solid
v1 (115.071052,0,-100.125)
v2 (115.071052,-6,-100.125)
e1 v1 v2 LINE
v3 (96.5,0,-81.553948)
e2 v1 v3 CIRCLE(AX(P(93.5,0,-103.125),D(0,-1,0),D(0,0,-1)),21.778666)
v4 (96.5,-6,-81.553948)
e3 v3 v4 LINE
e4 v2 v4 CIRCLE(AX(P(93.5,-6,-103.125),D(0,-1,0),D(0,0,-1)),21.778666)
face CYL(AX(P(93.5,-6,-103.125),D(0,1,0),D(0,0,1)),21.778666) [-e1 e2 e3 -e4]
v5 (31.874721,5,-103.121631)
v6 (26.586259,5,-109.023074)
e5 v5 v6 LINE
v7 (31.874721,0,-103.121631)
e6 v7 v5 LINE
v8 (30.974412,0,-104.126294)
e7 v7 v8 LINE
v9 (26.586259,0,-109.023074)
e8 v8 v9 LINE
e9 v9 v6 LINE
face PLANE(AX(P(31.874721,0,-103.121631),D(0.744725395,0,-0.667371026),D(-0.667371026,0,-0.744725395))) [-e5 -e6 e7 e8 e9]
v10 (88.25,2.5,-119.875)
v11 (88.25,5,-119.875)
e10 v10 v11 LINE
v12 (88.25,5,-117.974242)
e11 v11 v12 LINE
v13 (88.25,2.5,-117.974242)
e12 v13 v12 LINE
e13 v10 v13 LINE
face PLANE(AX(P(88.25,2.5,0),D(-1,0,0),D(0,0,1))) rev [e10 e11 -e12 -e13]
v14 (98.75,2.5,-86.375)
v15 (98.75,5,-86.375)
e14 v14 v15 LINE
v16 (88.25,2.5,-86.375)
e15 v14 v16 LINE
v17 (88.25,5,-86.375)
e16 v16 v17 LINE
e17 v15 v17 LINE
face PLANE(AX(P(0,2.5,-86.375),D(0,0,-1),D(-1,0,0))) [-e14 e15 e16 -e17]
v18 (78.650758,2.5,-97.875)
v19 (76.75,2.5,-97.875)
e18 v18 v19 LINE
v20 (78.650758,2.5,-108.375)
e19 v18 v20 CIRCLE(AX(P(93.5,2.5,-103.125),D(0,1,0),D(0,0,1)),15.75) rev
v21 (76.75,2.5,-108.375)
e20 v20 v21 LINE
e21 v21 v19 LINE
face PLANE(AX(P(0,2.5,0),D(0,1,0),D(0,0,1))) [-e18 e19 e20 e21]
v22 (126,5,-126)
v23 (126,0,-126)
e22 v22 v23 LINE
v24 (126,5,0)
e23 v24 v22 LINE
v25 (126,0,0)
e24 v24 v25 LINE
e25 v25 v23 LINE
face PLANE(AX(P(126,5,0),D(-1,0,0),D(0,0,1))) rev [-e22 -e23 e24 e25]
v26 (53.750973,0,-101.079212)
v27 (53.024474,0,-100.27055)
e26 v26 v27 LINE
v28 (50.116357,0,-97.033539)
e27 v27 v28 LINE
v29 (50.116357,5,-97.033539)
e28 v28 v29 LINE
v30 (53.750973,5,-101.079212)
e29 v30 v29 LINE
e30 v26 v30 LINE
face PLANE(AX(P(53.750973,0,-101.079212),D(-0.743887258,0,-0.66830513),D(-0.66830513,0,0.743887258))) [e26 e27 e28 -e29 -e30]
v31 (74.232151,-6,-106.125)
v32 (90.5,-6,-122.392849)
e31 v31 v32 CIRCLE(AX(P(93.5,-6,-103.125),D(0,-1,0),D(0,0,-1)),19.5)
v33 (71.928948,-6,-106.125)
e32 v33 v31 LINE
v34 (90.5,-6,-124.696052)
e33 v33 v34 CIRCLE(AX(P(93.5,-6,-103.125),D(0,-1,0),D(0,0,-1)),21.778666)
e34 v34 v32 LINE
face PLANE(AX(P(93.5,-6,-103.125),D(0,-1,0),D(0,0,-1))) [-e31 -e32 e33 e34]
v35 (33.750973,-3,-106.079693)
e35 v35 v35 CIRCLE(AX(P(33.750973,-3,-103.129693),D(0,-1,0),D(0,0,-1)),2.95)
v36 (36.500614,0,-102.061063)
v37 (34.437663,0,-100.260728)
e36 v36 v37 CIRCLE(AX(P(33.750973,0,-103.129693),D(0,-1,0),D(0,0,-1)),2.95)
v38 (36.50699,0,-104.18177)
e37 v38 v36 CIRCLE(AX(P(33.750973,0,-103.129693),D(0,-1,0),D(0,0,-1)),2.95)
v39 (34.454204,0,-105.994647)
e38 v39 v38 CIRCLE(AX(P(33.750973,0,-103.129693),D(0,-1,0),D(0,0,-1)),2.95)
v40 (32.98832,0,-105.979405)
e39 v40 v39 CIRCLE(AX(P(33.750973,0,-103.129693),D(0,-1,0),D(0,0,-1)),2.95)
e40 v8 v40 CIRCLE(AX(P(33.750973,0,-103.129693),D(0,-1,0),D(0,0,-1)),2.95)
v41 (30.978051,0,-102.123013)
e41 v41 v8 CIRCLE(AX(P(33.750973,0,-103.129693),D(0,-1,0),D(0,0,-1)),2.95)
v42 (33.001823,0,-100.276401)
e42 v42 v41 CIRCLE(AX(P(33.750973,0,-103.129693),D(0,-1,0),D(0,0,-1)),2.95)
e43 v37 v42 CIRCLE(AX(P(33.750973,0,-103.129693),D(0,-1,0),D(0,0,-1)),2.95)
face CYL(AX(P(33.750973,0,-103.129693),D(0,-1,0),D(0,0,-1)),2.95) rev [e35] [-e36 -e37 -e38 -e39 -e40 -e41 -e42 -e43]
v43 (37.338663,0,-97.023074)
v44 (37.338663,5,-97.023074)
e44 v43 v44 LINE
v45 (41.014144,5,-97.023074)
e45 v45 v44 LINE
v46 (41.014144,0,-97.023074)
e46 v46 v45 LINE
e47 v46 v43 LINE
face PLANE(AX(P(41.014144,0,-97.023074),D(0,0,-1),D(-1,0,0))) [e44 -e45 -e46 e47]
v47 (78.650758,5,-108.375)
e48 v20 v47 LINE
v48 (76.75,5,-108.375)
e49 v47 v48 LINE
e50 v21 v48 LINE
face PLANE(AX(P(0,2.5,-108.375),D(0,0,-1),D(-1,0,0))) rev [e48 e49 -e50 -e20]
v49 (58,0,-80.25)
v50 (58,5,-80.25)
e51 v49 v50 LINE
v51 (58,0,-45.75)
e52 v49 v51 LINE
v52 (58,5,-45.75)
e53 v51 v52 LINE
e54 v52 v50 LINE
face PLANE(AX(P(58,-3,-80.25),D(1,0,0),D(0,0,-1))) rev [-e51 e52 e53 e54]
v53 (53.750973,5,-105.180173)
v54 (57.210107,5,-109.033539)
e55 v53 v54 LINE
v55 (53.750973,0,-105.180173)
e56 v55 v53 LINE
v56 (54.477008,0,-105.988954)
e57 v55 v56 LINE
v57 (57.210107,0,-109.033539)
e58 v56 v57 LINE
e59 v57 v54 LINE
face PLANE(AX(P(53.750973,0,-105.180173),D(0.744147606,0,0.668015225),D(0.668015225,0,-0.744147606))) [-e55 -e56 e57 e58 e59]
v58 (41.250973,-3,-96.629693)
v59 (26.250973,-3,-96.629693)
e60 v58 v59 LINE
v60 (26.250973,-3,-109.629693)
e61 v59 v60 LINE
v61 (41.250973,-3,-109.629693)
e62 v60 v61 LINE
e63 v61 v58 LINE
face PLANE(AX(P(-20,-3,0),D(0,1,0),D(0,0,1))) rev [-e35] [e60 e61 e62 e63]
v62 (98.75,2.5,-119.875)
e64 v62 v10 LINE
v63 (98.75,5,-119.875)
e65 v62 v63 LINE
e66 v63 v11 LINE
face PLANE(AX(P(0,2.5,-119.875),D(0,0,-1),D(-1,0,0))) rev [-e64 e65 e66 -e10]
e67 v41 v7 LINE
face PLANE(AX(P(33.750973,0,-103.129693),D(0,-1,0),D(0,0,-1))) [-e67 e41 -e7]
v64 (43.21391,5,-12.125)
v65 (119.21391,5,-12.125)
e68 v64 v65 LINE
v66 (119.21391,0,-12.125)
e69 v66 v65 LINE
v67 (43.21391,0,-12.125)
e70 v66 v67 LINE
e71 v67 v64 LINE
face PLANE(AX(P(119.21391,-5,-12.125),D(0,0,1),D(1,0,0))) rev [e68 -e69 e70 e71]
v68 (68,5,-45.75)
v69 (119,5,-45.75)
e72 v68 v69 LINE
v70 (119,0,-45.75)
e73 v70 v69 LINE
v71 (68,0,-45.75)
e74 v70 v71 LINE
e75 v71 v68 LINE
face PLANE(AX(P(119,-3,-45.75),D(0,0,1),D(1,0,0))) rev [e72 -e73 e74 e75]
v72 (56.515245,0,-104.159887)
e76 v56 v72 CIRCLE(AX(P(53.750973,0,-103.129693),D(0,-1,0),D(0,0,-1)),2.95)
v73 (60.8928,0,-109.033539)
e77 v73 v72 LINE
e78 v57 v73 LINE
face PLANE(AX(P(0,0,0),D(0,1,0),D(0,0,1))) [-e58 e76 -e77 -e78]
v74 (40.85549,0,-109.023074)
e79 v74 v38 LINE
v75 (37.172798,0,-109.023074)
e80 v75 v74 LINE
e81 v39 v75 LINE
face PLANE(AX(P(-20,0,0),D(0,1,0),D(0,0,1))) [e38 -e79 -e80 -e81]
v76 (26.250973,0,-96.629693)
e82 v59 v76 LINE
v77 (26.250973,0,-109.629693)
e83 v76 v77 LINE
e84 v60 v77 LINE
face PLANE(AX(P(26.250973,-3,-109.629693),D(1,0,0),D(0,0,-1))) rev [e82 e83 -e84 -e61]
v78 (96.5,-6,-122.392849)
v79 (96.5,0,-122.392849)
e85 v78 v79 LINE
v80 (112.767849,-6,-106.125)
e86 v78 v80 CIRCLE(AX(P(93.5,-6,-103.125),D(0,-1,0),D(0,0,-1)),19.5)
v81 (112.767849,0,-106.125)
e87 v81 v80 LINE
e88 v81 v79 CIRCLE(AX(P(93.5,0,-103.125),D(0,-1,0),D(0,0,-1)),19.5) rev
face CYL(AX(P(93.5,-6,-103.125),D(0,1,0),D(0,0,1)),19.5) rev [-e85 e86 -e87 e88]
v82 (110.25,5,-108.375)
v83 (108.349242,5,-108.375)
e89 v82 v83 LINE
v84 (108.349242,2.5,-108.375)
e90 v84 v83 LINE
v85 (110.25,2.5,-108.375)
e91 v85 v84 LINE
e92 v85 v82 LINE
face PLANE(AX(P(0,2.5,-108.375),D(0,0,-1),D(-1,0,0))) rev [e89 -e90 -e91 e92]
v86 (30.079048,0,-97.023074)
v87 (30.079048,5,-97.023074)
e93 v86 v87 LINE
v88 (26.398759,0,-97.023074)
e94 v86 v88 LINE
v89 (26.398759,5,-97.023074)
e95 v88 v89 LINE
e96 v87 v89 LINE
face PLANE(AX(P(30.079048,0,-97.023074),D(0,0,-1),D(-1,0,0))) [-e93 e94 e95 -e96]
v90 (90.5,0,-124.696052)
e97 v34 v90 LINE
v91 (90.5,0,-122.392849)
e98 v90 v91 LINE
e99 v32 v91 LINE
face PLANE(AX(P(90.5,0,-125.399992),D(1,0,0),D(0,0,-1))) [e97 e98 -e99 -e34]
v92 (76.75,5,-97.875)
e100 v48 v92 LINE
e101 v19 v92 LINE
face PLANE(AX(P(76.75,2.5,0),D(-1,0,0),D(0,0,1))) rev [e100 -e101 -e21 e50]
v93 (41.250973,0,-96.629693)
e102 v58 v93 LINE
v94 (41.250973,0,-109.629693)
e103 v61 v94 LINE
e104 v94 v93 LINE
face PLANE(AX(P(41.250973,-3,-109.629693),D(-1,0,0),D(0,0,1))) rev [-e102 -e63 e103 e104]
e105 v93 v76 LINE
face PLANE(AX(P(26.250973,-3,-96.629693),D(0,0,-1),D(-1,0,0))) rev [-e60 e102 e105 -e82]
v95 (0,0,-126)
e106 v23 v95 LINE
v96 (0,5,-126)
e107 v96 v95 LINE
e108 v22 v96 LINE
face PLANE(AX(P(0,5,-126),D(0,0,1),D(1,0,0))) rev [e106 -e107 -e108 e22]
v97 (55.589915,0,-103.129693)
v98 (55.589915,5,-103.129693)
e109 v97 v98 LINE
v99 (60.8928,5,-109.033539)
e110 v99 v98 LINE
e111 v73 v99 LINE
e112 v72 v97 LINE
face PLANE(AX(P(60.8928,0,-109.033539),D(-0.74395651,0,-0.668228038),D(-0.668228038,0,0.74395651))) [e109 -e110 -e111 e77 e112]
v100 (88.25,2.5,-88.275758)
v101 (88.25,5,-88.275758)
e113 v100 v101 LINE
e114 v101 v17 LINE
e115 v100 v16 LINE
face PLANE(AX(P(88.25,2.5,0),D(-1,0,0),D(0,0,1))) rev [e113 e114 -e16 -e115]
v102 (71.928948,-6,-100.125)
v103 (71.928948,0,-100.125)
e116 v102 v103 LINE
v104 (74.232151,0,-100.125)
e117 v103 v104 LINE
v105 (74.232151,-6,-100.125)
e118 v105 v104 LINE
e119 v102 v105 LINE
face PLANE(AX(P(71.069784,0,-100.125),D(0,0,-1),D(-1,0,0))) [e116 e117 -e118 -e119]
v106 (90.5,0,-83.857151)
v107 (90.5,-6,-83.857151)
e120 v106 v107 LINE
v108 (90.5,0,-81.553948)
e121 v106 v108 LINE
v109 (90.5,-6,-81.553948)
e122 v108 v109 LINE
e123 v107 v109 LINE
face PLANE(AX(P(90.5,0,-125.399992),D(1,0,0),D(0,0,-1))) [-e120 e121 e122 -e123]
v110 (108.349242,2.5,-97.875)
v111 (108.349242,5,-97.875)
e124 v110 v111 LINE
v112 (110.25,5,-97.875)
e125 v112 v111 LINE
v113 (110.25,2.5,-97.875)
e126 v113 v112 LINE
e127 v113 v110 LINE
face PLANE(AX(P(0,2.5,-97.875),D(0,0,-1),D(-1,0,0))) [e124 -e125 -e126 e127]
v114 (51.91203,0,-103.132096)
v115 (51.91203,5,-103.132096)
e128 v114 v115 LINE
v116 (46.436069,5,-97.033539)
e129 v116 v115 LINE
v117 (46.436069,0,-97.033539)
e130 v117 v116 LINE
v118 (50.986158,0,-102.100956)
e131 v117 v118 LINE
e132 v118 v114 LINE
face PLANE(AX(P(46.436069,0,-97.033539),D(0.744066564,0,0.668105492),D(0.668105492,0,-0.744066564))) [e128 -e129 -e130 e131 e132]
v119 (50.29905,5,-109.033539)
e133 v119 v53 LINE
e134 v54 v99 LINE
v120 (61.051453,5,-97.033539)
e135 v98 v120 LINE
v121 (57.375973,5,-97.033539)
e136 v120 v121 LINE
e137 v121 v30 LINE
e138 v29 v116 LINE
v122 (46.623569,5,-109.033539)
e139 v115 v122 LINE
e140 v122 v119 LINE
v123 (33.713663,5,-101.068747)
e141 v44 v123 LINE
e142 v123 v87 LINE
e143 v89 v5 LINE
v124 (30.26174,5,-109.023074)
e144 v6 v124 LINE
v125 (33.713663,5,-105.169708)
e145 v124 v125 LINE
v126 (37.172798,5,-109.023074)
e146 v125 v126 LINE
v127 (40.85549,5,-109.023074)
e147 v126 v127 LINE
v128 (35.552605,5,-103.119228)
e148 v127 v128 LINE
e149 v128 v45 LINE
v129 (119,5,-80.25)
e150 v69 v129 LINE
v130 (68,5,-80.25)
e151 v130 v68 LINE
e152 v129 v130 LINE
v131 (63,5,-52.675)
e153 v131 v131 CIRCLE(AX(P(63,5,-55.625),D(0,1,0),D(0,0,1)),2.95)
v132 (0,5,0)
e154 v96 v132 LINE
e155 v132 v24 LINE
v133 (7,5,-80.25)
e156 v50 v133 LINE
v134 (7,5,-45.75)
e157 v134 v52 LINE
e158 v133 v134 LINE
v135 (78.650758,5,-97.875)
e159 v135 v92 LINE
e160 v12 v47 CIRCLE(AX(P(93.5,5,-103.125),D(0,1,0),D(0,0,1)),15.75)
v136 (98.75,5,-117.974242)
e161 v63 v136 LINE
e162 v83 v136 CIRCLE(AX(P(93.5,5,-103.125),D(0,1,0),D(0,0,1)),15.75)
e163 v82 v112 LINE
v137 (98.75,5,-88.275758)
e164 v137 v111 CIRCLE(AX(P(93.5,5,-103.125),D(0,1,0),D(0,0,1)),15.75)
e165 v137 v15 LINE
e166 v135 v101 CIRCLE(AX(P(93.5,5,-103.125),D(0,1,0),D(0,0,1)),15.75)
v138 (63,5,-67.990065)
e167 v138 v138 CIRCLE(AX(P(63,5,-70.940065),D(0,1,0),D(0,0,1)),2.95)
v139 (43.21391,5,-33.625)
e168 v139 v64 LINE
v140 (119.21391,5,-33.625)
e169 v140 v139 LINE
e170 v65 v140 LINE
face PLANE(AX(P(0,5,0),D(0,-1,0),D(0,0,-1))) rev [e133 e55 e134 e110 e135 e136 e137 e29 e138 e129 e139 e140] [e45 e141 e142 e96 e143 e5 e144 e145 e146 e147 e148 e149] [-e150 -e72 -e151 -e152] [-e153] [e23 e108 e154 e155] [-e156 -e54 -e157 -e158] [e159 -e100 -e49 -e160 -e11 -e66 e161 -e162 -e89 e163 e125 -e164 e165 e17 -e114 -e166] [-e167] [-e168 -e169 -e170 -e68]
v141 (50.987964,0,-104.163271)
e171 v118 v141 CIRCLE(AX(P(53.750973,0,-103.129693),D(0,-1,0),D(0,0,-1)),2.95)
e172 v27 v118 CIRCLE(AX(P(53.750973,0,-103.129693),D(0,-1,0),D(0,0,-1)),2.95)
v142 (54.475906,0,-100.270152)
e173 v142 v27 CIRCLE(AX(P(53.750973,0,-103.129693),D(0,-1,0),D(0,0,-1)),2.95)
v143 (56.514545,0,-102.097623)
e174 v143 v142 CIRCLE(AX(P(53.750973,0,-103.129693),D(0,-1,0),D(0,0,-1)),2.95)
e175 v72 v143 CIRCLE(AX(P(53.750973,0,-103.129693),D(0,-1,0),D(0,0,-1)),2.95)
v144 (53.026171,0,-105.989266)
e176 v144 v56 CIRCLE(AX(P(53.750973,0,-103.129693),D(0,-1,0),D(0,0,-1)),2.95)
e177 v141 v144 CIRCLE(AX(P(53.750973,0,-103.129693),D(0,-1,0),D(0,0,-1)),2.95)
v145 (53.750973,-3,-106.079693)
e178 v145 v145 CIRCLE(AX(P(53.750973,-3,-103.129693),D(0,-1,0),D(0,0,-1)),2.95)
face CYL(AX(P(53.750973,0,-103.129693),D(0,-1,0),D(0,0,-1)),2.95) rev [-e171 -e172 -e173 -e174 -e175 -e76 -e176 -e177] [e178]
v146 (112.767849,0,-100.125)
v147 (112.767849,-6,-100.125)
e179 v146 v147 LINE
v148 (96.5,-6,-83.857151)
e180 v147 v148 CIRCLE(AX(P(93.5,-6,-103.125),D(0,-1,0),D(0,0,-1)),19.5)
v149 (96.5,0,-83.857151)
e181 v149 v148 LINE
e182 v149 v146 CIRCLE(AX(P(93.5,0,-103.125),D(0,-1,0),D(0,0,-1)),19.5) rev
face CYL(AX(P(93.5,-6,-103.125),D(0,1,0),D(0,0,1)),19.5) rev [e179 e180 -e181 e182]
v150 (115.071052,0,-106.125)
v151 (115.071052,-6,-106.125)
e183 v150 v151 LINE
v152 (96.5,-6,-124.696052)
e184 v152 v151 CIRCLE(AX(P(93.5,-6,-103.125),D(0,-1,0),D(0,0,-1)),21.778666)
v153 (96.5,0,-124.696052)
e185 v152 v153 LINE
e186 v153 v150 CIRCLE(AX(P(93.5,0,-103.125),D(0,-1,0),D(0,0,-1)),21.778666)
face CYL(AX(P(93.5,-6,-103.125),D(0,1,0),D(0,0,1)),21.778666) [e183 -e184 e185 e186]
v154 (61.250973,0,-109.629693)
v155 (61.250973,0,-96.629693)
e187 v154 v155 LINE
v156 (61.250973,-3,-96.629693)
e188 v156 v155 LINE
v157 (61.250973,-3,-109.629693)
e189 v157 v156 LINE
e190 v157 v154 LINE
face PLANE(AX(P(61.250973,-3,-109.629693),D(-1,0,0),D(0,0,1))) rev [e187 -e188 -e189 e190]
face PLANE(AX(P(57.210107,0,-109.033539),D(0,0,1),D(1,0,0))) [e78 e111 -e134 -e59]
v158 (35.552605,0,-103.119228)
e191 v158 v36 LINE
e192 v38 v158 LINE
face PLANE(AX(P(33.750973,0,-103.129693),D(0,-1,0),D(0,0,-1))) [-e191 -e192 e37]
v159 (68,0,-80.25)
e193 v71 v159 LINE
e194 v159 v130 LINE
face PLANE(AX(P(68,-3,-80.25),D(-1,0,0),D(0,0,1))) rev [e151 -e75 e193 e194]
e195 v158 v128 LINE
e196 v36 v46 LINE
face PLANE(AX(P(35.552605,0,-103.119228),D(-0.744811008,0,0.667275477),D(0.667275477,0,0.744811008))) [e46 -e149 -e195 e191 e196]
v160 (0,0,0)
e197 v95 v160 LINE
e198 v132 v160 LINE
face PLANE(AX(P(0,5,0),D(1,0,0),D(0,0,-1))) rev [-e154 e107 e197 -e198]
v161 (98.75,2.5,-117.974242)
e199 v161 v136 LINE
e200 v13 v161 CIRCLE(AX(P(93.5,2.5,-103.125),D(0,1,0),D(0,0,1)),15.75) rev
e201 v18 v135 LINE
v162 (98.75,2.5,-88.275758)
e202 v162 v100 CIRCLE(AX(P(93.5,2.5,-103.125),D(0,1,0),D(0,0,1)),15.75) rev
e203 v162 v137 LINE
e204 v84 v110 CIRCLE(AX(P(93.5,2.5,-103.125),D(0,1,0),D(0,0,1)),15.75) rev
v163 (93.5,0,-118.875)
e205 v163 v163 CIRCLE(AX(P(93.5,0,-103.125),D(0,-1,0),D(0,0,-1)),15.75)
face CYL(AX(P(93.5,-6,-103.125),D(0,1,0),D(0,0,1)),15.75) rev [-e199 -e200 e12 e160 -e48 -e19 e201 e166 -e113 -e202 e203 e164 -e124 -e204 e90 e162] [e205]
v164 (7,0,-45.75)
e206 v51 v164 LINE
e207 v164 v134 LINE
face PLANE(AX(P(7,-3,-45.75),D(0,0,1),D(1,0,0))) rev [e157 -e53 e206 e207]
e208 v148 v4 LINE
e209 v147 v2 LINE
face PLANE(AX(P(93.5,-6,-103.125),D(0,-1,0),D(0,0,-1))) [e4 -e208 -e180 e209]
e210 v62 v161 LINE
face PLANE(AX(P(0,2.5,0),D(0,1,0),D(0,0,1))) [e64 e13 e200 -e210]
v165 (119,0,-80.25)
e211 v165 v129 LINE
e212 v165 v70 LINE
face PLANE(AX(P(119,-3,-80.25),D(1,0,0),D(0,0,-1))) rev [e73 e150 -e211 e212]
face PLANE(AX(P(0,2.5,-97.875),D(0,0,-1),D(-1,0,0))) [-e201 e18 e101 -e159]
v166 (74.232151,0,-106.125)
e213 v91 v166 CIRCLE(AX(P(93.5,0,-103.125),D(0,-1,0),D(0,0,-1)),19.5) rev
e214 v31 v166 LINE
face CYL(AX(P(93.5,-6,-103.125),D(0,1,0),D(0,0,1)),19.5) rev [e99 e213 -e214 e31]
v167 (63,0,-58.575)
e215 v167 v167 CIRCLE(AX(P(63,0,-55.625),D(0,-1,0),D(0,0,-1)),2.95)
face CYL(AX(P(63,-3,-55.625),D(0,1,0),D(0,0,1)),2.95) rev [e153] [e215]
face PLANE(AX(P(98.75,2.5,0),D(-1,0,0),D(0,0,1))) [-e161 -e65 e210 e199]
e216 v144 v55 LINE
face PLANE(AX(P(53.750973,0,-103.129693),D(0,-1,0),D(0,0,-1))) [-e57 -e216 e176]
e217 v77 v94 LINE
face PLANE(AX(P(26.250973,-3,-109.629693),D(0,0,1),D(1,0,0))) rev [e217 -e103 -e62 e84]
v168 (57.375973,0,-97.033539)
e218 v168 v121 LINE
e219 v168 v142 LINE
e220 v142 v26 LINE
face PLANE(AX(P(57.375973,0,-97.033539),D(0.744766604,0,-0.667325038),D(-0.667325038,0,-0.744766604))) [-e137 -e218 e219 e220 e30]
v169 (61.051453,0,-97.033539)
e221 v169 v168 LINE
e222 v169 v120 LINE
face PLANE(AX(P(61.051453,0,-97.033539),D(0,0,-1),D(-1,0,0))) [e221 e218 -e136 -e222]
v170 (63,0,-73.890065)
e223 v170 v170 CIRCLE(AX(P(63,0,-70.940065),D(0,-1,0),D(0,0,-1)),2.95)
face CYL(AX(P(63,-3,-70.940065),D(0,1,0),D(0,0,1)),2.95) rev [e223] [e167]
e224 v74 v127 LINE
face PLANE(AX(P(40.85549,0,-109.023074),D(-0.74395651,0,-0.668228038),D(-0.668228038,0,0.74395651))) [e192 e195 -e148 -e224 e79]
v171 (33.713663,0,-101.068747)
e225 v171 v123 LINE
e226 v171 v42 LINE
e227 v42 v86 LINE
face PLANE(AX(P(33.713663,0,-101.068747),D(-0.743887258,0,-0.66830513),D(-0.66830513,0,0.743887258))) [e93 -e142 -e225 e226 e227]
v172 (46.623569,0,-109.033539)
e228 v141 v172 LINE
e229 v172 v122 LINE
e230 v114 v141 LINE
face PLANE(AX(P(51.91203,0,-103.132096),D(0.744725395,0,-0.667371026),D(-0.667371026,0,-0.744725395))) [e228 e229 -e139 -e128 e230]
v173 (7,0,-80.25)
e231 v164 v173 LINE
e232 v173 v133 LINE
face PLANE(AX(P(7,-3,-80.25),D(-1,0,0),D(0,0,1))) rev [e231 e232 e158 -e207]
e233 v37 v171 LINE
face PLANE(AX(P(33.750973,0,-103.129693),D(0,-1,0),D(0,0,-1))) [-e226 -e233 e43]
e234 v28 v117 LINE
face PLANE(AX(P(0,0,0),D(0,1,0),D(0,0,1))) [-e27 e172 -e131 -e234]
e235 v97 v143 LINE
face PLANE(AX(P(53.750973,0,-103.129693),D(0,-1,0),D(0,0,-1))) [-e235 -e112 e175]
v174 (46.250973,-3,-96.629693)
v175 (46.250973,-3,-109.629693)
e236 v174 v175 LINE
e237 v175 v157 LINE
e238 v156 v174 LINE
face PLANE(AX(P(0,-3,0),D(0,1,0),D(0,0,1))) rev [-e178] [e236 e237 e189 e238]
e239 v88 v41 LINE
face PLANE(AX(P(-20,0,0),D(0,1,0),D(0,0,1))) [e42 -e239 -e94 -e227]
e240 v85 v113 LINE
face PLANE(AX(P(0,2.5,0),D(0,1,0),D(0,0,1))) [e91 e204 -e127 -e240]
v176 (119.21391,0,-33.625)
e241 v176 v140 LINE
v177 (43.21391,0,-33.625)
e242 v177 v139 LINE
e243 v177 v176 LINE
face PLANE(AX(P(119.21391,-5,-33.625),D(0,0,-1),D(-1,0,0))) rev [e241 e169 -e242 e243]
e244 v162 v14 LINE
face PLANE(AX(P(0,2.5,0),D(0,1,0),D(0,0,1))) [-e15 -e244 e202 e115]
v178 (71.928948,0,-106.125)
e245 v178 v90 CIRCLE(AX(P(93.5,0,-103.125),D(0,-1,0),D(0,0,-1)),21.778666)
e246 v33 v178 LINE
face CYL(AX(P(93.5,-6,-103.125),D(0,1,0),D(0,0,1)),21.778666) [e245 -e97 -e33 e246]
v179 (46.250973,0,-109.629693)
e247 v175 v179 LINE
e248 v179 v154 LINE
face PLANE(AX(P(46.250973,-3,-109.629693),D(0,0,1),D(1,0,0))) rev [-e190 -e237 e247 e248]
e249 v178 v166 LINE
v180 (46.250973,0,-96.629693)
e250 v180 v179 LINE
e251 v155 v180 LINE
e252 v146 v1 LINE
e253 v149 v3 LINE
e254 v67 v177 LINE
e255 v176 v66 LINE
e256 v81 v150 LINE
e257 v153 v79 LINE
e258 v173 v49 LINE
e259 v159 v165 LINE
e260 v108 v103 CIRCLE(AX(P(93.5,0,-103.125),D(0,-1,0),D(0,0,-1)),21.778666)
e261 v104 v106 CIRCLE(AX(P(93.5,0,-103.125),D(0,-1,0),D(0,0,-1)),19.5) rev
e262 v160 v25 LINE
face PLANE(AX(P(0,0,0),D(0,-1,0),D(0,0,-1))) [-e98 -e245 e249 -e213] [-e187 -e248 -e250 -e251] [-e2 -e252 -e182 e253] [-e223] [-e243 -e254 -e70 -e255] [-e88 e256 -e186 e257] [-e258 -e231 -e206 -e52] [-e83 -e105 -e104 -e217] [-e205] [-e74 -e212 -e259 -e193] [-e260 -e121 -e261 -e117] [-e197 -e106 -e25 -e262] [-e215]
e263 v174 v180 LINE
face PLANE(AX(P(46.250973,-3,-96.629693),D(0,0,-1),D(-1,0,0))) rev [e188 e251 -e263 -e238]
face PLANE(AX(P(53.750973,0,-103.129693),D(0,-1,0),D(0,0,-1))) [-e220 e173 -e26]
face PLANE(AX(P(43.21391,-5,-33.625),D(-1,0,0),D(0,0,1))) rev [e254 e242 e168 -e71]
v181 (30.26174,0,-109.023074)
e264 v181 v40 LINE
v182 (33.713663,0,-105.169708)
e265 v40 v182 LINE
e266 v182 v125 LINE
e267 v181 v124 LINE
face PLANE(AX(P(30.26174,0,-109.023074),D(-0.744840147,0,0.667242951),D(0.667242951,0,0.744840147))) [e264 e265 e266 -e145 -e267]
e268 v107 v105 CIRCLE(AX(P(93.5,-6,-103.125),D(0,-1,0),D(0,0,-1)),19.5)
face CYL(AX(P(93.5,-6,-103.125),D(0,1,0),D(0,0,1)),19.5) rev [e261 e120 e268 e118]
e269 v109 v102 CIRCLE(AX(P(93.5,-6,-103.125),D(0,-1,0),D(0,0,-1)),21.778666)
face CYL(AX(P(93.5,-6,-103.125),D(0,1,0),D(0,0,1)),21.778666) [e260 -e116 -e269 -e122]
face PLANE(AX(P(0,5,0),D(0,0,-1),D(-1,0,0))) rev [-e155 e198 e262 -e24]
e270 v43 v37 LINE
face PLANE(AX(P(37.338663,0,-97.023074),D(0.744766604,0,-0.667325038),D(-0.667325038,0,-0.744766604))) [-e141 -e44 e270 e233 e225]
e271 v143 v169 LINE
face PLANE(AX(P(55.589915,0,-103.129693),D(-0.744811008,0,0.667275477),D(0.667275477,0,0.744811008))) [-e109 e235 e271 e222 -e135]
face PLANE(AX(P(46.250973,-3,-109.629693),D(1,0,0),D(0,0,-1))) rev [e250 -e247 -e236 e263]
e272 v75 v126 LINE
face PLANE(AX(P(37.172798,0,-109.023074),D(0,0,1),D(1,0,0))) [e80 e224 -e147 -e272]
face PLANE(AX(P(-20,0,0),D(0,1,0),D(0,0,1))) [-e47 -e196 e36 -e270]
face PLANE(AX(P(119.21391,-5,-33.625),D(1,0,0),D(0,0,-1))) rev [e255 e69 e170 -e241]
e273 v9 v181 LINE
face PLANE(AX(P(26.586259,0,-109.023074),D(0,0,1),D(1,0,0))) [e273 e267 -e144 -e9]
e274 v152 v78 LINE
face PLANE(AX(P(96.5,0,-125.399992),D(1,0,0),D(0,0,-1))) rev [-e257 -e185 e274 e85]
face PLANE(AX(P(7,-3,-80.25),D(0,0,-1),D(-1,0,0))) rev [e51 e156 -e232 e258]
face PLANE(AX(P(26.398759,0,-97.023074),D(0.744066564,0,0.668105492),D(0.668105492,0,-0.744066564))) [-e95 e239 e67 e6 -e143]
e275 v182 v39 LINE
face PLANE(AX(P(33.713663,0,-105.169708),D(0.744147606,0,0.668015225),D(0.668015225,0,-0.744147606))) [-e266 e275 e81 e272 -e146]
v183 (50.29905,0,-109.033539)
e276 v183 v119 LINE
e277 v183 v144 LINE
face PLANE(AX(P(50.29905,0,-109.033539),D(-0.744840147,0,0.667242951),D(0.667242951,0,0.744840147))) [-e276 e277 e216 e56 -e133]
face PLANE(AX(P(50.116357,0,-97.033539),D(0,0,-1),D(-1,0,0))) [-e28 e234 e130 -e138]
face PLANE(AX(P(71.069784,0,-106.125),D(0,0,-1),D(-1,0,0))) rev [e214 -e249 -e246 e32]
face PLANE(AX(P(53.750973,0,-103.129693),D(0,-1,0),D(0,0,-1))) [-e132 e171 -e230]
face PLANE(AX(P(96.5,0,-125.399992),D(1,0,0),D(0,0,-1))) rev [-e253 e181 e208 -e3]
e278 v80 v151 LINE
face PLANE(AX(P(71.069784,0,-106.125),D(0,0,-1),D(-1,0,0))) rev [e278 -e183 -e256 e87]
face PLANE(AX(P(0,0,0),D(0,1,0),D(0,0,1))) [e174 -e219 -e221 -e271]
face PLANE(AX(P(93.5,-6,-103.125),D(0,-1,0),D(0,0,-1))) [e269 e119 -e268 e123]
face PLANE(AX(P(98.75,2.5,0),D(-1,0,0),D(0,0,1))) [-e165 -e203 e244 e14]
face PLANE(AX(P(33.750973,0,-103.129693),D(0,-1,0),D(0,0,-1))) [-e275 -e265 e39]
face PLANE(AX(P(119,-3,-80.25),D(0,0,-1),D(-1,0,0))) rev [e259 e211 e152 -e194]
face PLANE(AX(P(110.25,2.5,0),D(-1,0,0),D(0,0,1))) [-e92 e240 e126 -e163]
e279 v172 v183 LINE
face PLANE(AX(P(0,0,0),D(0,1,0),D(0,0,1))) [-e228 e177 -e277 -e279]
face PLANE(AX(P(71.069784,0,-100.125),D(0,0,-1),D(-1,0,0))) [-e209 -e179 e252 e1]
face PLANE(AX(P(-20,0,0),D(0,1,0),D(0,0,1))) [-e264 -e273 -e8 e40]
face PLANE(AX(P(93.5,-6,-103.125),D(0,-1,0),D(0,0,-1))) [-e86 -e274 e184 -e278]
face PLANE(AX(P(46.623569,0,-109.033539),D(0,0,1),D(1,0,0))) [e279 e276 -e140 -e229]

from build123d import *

# Parameters (mm, degrees)
SKETCH1_W           = 126
SKETCH1_H           = 126
BOSS_EXTRUDE1_DEPTH = 5
SKETCH4_W           = 76
SKETCH4_H           = 21.5
CUT_EXTRUDE3_DEPTH  = 10
CUT_EXTRUDE4_START  = -5
CUT_EXTRUDE4_DEPTH  = 5
SKETCH11_W          = 15
SKETCH11_H          = 13
BOSS_EXTRUDE2_DEPTH = 3
SKETCH12_R          = 2.95
CUT_EXTRUDE5_DEPTH  = 3
LPATTERN1_COUNT     = 2
LPATTERN1_PITCH     = 20
LPATTERN2_COUNT     = 2
LPATTERN2_PITCH     = 20
SKETCH13_W          = 51
SKETCH13_H          = 34.5
CUT_EXTRUDE6_DEPTH  = 179.370401132
SKETCH14_W          = 51
SKETCH14_H          = 34.5
CUT_EXTRUDE7_DEPTH  = 179.370401132
SKETCH17_R          = 2.95
CUT_EXTRUDE10_DEPTH = 179.370401132
SKETCH18_R          = 21.778665512
SKETCH18_R_2        = 19.5
BOSS_EXTRUDE3_DEPTH = 6
SKETCH19_W          = 44.860431558
SKETCH19_H          = 6
SKETCH19_W_2        = 6
SKETCH19_H_2        = 44.549983506
CUT_EXTRUDE11_DEPTH = 6
SKETCH21_R          = 15.75
CUT_EXTRUDE14_DEPTH = 179.530109505
CUT_EXTRUDE15_DEPTH = 2.5


# Read off the part's stored shape, not the designer's step: Cut-Extrude4
with BuildPart() as part:
    # Sketch1 → Boss-Extrude1 (new body)
    with BuildSketch(Plane(origin=(0, 0, 0), x_dir=(1, 0, 0), z_dir=(0, 1, 0))):
        with Locations((63, 63)):
            Rectangle(SKETCH1_W, SKETCH1_H)
    extrude(amount=BOSS_EXTRUDE1_DEPTH)

    # Sketch4 → Cut-Extrude3 (cut)
    with BuildSketch(Plane(origin=(0, 5, 0), x_dir=(1, 0, 0), z_dir=(0, 1, 0))):
        with Locations((81.213909597, 22.875)):
            Rectangle(SKETCH4_W, SKETCH4_H)
    extrude(amount=-CUT_EXTRUDE3_DEPTH, mode=Mode.SUBTRACT)

    # Cut-Extrude4 outline → Cut-Extrude4 (cut)
    with BuildSketch(Plane(origin=(0, 5, 0), x_dir=(1, 0, 0), z_dir=(0, 1, 0)).offset(CUT_EXTRUDE4_START)):
        Polygon((46.623568796, 109.033538796), (51.912030335, 103.132096488), (46.436068796, 97.033538796), (50.116357258, 97.033538796), (53.750972642, 101.079211873), (57.375972642, 97.033538796), (61.051453412, 97.033538796), (55.58991495, 103.129692642), (60.892799565, 109.033538796), (57.210107258, 109.033538796), (53.750972642, 105.180173411), (50.299049565, 109.033538796), align=None)
        Polygon((26.586259271, 109.023073742), (31.87472081, 103.121631435), (26.398759271, 97.023073742), (30.079047733, 97.023073742), (33.713663117, 101.068746819), (37.338663117, 97.023073742), (41.014143886, 97.023073742), (35.552605425, 103.119227588), (40.85549004, 109.023073742), (37.172797733, 109.023073742), (33.713663117, 105.169708358), (30.26174004, 109.023073742), align=None)
    extrude(amount=CUT_EXTRUDE4_DEPTH, mode=Mode.SUBTRACT)

    # Sketch11 → Boss-Extrude2 (add)
    with BuildSketch(Plane.XZ):
        with Locations((53.750972642, -103.129692642)):
            Rectangle(SKETCH11_W, SKETCH11_H)
    boss_extrude2 = extrude(amount=BOSS_EXTRUDE2_DEPTH)

    # Sketch12 → Cut-Extrude5 (cut)
    with BuildSketch(Plane.XZ.offset(3)):
        with Locations(Location((53.750972642, -103.129692642, 0), (0, 0, 270))):
            Circle(SKETCH12_R)
    cut_extrude5 = extrude(amount=-CUT_EXTRUDE5_DEPTH, mode=Mode.SUBTRACT)

    # LPattern1: Boss-Extrude2 ×2
    with Locations(*[(-i * LPATTERN1_PITCH, 0, 0) for i in range(1, LPATTERN1_COUNT)]):
        add(boss_extrude2)

    # LPattern2: Cut-Extrude5 ×2
    with Locations(*[(-i * LPATTERN2_PITCH, 0, 0) for i in range(1, LPATTERN2_COUNT)]):
        add(cut_extrude5, mode=Mode.SUBTRACT)

    # Sketch13 → Cut-Extrude6 (cut, through all)
    with BuildSketch(Plane(origin=(0, 5, 0), x_dir=(1, 0, 0), z_dir=(0, 1, 0))):
        with Locations((32.5, 63)):
            Rectangle(SKETCH13_W, SKETCH13_H)
    extrude(amount=-CUT_EXTRUDE6_DEPTH, mode=Mode.SUBTRACT)

    # Sketch14 → Cut-Extrude7 (cut, through all)
    with BuildSketch(Plane(origin=(0, 5, 0), x_dir=(1, 0, 0), z_dir=(0, 1, 0))):
        with Locations((93.5, 63)):
            Rectangle(SKETCH14_W, SKETCH14_H)
    extrude(amount=-CUT_EXTRUDE7_DEPTH, mode=Mode.SUBTRACT)

    # Sketch17 → Cut-Extrude10 (cut, through all)
    with BuildSketch(Plane(origin=(0, 5, 0), x_dir=(1, 0, 0), z_dir=(0, 1, 0))):
        with Locations(Location((63, 55.625, 0), (0, 0, 270))):
            Circle(SKETCH17_R)
        with Locations(Location((63, 70.940065171, 0), (0, 0, 270))):
            Circle(SKETCH17_R)
    extrude(amount=-CUT_EXTRUDE10_DEPTH, mode=Mode.SUBTRACT)

    # Sketch18 → Boss-Extrude3 (add)
    with BuildSketch(Plane.XZ):
        with Locations(Location((93.5, -103.125, 0), (0, 0, 270))):
            Circle(SKETCH18_R)
        with Locations(Location((93.5, -103.125, 0), (0, 0, 270))):
            Circle(SKETCH18_R_2, mode=Mode.SUBTRACT)
    extrude(amount=BOSS_EXTRUDE3_DEPTH)

    # Sketch19 → Cut-Extrude11 (cut)
    with BuildSketch(Plane.XZ.offset(6)):
        with Locations((93.5, -103.125)):
            Rectangle(SKETCH19_W, SKETCH19_H)
        with Locations((93.5, -103.125)):
            Rectangle(SKETCH19_W_2, SKETCH19_H_2)
    extrude(amount=-CUT_EXTRUDE11_DEPTH, mode=Mode.SUBTRACT)

    # Sketch21 → Cut-Extrude14 (cut, through all)
    with BuildSketch(Plane(origin=(0, 5, 0), x_dir=(1, 0, 0), z_dir=(0, 1, 0))):
        with Locations(Location((93.5, 103.125, 0), (0, 0, 270))):
            Circle(SKETCH21_R)
    extrude(amount=-CUT_EXTRUDE14_DEPTH, mode=Mode.SUBTRACT)

    # Sketch22 → Cut-Extrude15 (cut)
    with BuildSketch(Plane(origin=(0, 5, 0), x_dir=(1, 0, 0), z_dir=(0, 1, 0))):
        with BuildLine():
            ThreePointArc((78.650757595, 97.875), (77.75, 103.125), (78.650757595, 108.375))
            Line((78.650757595, 108.375), (76.75, 108.375))
            Line((76.75, 108.375), (76.75, 97.875))
            Line((76.75, 97.875), (78.650757595, 97.875))
        make_face()
        with BuildLine():
            ThreePointArc((88.25, 117.974242405), (93.5, 118.875), (98.75, 117.974242405))
            Line((98.75, 117.974242405), (98.75, 119.875))
            Line((98.75, 119.875), (88.25, 119.875))
            Line((88.25, 119.875), (88.25, 117.974242405))
        make_face()
        with BuildLine():
            Line((110.25, 97.875), (110.25, 108.375))
            Line((110.25, 108.375), (108.349242405, 108.375))
            ThreePointArc((108.349242405, 108.375), (109.023177315, 105.788356165), (109.25, 103.125))
            ThreePointArc((109.25, 103.125), (109.023177315, 100.461643835), (108.349242405, 97.875))
            Line((108.349242405, 97.875), (110.25, 97.875))
        make_face()
        with BuildLine():
            Line((98.75, 86.375), (98.75, 88.275757595))
            ThreePointArc((98.75, 88.275757595), (93.5, 87.375), (88.25, 88.275757595))
            Line((88.25, 88.275757595), (88.25, 86.375))
            Line((88.25, 86.375), (98.75, 86.375))
        make_face()
    extrude(amount=-CUT_EXTRUDE15_DEPTH, mode=Mode.SUBTRACT)


solid = part.part
